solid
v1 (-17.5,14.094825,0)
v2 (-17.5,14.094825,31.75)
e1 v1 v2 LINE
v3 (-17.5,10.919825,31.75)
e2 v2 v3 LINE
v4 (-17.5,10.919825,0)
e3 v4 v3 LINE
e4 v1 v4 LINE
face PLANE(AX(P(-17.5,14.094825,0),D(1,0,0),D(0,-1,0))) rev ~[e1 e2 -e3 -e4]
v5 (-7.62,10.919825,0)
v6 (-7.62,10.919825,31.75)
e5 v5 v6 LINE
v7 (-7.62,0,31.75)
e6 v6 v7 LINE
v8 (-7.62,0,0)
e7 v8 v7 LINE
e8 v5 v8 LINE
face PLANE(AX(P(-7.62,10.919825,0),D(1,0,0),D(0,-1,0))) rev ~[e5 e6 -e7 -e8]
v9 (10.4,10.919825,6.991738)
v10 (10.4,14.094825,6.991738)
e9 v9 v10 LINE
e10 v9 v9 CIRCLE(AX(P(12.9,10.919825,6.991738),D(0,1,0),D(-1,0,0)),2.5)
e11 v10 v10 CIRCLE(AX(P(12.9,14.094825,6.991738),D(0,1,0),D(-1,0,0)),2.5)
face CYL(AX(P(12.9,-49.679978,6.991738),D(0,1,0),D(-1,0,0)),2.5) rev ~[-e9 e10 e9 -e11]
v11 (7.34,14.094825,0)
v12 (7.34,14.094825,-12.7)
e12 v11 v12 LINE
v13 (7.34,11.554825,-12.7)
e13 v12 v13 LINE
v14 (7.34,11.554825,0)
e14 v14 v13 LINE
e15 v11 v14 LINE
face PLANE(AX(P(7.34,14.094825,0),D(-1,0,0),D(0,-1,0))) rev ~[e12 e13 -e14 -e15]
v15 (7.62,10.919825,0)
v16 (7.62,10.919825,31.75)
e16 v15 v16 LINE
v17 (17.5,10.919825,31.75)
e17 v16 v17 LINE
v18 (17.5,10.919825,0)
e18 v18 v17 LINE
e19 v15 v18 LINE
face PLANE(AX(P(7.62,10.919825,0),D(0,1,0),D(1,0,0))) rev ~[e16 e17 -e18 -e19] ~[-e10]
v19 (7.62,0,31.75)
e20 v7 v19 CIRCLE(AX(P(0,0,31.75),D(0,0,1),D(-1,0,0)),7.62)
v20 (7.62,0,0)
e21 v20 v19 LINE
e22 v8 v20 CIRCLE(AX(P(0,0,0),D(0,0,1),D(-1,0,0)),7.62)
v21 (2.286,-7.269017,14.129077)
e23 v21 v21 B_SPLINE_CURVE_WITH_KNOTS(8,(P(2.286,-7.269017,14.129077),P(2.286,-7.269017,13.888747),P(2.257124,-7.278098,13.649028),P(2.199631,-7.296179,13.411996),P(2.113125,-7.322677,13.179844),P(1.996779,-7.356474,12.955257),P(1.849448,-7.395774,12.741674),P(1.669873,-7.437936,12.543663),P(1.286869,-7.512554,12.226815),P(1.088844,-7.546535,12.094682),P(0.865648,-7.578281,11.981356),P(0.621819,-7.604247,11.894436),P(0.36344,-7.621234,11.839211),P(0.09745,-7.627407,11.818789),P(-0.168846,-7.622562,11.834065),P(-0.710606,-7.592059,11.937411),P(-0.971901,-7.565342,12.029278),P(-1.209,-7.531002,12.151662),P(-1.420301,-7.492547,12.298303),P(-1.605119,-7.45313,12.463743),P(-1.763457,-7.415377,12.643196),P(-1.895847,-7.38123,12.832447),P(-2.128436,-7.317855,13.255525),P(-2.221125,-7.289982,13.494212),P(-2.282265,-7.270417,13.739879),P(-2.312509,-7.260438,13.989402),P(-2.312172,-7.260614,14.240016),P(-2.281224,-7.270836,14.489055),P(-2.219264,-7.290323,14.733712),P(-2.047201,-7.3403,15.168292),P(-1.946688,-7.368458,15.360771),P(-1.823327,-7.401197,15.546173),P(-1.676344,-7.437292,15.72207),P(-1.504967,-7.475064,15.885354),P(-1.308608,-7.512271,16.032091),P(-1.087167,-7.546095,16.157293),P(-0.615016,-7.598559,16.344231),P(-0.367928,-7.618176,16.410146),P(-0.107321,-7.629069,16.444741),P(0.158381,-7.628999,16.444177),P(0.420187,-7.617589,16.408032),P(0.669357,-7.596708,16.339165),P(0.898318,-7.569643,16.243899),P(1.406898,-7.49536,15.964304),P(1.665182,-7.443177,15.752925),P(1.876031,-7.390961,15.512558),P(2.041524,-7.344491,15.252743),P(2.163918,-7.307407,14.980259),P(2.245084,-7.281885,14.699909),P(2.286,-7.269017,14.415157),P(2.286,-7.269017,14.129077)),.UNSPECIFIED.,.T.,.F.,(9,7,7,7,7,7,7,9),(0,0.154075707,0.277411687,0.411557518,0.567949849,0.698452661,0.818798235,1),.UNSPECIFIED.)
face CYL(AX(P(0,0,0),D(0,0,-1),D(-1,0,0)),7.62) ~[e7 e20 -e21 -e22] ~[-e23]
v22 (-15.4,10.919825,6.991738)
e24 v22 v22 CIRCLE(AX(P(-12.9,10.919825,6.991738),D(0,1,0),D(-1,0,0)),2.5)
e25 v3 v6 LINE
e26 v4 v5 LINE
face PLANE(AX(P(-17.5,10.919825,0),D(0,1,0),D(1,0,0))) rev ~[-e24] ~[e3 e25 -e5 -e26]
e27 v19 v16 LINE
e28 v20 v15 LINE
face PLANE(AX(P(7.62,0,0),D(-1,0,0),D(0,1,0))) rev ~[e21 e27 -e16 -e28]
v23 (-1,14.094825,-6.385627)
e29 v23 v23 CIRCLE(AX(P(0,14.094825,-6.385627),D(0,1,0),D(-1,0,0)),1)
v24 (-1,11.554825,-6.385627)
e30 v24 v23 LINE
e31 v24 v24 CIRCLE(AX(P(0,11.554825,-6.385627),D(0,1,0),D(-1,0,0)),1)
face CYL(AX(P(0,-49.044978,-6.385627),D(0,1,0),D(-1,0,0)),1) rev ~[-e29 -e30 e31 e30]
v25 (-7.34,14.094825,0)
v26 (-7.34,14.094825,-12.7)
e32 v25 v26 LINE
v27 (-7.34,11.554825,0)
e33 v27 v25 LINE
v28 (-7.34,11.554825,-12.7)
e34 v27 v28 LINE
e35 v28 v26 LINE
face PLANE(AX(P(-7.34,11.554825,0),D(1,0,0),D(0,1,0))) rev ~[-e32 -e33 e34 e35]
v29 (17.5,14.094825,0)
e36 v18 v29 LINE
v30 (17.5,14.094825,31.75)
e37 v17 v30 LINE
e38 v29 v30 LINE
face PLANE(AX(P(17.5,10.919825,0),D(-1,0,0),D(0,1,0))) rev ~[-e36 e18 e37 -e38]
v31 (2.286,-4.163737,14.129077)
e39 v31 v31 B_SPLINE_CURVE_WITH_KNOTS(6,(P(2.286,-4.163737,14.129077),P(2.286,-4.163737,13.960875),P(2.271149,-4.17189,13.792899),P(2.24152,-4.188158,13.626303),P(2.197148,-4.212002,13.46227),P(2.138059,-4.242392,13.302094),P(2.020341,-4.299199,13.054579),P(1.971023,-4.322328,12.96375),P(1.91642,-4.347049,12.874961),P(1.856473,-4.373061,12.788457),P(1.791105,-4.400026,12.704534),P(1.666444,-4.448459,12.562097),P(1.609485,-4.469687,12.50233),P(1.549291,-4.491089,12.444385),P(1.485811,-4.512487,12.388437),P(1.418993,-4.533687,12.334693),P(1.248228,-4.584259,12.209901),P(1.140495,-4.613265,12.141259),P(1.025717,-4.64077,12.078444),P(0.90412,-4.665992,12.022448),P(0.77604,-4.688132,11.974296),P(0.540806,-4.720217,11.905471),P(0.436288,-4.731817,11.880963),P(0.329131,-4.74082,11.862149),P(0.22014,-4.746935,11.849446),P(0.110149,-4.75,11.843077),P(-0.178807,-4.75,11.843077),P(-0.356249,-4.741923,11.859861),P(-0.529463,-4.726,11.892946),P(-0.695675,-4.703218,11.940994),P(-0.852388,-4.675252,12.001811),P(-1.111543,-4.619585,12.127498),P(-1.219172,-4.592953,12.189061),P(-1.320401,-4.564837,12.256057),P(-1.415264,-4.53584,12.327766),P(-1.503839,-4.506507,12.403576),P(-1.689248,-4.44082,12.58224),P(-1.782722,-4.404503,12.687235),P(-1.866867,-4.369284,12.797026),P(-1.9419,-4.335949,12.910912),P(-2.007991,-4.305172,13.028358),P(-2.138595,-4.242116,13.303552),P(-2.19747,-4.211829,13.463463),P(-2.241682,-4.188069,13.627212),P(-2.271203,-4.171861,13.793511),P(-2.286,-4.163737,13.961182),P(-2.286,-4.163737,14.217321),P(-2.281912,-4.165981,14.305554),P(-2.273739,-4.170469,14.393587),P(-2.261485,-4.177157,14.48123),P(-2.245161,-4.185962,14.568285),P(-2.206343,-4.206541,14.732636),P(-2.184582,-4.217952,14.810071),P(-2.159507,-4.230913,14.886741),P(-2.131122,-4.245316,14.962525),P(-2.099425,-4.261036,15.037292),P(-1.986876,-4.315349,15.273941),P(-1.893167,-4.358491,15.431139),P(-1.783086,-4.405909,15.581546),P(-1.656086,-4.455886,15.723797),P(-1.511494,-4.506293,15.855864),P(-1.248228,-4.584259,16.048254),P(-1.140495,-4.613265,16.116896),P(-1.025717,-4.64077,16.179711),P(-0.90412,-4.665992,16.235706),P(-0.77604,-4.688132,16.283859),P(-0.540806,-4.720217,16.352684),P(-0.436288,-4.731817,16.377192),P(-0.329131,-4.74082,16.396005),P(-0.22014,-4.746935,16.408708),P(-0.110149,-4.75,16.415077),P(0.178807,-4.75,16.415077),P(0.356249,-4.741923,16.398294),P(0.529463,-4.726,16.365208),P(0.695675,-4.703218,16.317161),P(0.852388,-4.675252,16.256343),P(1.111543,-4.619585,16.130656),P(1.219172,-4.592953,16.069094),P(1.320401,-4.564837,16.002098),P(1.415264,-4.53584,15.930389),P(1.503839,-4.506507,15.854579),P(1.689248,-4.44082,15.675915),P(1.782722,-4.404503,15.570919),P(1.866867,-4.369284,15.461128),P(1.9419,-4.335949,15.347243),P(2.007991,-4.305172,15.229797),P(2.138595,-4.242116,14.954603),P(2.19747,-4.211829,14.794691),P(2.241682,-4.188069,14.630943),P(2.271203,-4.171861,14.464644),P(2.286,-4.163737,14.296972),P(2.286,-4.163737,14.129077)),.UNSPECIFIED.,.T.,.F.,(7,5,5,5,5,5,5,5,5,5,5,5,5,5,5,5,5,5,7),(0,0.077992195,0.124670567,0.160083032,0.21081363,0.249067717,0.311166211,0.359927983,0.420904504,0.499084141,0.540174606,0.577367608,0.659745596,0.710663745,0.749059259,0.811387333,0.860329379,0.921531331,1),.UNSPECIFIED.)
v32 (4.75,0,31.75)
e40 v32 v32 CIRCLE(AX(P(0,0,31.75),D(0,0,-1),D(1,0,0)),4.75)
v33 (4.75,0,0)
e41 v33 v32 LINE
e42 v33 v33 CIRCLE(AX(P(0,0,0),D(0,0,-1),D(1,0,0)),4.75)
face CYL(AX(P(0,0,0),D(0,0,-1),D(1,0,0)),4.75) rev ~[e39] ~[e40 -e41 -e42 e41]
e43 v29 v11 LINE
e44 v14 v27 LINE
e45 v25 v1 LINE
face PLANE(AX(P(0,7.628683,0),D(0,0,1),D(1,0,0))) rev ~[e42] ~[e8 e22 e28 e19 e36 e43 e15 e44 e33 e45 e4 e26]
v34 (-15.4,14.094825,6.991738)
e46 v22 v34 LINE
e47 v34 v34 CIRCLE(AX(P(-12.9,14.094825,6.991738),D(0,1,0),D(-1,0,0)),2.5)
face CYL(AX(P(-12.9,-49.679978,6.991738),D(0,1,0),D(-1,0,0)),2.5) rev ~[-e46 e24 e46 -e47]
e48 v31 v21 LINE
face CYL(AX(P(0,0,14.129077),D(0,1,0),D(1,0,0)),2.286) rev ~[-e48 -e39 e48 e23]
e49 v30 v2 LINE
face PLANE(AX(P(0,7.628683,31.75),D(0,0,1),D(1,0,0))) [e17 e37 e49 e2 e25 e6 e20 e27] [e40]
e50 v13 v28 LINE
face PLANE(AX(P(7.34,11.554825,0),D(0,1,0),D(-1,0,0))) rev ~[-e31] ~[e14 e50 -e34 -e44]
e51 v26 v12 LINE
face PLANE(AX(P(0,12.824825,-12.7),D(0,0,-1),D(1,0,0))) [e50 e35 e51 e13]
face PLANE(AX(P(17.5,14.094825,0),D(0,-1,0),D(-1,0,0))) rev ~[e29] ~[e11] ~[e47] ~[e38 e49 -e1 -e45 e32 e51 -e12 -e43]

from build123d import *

# Parameters (mm, degrees)
F1_DEPTH = 31.75
F2_R     = 4.75
F3_DEPTH = 38.1
F5_D     = 4.572
F5_DEPTH = 7.621
F7_DEPTH = 12.7
F9_D     = 2
F11_D    = 5


# Not quite as in the source:
# - a feature names something its author has since deleted; it is built from what else it names


with BuildPart() as f1:
    # F0 (on Top) → F1 (new body)
    with BuildSketch(Plane.XY):
        with BuildLine():
            Line((-7.62, 10.9198254229), (-7.62, 0))
            ThreePointArc((-7.62, 0), (0, -7.62), (7.62, 0))
            Line((7.62, 0), (7.62, 10.9198254229))
            Line((7.62, 10.9198254229), (17.5, 10.9198254229))
            Line((17.5, 10.9198254229), (17.5, 14.0948254229))
            Line((17.5, 14.0948254229), (-17.5, 14.0948254229))
            Line((-17.5, 14.0948254229), (-17.5, 10.9198254229))
            Line((-17.5, 10.9198254229), (-7.62, 10.9198254229))
        make_face()
    extrude(amount=F1_DEPTH)

    # F2 (on face) → F3 (cut)
    with BuildSketch(Plane(origin=(0, 0, 0), x_dir=(1, 0, 0), z_dir=(0, 0, -1))):
        Circle(F2_R)
    extrude(amount=-F3_DEPTH, mode=Mode.SUBTRACT)

    # F5 (through all, one way)
    with BuildSketch(Plane(origin=(0, 0, 0), x_dir=(1, 0, 0), z_dir=(0, 1, 0))):
        with Locations((0, -14.1290773165)):
            Circle(F5_D / 2)
    extrude(amount=-F5_DEPTH, mode=Mode.SUBTRACT)

    # F6 (on face) → F7 (join)
    with BuildSketch(Plane(origin=(0, 0, 0), x_dir=(1, 0, 0), z_dir=(0, 0, -1))):
        Polygon((-7.34, -11.5548254229), (-7.34, -14.0948254229), (0, -14.0948254229), (7.34, -14.0948254229), (7.34, -11.5548254229), (0, -11.5548254229), align=None)
    extrude(amount=F7_DEPTH)

    # F9 (through all)
    with Locations(Plane.XZ.offset(-11.5548254229)):
        with Locations((0, -6.3856272027)):
            Hole(F9_D / 2)

    # F11 (through all)
    with Locations(Plane.XZ.offset(-10.9198254229)):
        with Locations((-12.9, 6.9917379814), (12.9, 6.9917379814)):
            Hole(F11_D / 2)


solid = f1.part
